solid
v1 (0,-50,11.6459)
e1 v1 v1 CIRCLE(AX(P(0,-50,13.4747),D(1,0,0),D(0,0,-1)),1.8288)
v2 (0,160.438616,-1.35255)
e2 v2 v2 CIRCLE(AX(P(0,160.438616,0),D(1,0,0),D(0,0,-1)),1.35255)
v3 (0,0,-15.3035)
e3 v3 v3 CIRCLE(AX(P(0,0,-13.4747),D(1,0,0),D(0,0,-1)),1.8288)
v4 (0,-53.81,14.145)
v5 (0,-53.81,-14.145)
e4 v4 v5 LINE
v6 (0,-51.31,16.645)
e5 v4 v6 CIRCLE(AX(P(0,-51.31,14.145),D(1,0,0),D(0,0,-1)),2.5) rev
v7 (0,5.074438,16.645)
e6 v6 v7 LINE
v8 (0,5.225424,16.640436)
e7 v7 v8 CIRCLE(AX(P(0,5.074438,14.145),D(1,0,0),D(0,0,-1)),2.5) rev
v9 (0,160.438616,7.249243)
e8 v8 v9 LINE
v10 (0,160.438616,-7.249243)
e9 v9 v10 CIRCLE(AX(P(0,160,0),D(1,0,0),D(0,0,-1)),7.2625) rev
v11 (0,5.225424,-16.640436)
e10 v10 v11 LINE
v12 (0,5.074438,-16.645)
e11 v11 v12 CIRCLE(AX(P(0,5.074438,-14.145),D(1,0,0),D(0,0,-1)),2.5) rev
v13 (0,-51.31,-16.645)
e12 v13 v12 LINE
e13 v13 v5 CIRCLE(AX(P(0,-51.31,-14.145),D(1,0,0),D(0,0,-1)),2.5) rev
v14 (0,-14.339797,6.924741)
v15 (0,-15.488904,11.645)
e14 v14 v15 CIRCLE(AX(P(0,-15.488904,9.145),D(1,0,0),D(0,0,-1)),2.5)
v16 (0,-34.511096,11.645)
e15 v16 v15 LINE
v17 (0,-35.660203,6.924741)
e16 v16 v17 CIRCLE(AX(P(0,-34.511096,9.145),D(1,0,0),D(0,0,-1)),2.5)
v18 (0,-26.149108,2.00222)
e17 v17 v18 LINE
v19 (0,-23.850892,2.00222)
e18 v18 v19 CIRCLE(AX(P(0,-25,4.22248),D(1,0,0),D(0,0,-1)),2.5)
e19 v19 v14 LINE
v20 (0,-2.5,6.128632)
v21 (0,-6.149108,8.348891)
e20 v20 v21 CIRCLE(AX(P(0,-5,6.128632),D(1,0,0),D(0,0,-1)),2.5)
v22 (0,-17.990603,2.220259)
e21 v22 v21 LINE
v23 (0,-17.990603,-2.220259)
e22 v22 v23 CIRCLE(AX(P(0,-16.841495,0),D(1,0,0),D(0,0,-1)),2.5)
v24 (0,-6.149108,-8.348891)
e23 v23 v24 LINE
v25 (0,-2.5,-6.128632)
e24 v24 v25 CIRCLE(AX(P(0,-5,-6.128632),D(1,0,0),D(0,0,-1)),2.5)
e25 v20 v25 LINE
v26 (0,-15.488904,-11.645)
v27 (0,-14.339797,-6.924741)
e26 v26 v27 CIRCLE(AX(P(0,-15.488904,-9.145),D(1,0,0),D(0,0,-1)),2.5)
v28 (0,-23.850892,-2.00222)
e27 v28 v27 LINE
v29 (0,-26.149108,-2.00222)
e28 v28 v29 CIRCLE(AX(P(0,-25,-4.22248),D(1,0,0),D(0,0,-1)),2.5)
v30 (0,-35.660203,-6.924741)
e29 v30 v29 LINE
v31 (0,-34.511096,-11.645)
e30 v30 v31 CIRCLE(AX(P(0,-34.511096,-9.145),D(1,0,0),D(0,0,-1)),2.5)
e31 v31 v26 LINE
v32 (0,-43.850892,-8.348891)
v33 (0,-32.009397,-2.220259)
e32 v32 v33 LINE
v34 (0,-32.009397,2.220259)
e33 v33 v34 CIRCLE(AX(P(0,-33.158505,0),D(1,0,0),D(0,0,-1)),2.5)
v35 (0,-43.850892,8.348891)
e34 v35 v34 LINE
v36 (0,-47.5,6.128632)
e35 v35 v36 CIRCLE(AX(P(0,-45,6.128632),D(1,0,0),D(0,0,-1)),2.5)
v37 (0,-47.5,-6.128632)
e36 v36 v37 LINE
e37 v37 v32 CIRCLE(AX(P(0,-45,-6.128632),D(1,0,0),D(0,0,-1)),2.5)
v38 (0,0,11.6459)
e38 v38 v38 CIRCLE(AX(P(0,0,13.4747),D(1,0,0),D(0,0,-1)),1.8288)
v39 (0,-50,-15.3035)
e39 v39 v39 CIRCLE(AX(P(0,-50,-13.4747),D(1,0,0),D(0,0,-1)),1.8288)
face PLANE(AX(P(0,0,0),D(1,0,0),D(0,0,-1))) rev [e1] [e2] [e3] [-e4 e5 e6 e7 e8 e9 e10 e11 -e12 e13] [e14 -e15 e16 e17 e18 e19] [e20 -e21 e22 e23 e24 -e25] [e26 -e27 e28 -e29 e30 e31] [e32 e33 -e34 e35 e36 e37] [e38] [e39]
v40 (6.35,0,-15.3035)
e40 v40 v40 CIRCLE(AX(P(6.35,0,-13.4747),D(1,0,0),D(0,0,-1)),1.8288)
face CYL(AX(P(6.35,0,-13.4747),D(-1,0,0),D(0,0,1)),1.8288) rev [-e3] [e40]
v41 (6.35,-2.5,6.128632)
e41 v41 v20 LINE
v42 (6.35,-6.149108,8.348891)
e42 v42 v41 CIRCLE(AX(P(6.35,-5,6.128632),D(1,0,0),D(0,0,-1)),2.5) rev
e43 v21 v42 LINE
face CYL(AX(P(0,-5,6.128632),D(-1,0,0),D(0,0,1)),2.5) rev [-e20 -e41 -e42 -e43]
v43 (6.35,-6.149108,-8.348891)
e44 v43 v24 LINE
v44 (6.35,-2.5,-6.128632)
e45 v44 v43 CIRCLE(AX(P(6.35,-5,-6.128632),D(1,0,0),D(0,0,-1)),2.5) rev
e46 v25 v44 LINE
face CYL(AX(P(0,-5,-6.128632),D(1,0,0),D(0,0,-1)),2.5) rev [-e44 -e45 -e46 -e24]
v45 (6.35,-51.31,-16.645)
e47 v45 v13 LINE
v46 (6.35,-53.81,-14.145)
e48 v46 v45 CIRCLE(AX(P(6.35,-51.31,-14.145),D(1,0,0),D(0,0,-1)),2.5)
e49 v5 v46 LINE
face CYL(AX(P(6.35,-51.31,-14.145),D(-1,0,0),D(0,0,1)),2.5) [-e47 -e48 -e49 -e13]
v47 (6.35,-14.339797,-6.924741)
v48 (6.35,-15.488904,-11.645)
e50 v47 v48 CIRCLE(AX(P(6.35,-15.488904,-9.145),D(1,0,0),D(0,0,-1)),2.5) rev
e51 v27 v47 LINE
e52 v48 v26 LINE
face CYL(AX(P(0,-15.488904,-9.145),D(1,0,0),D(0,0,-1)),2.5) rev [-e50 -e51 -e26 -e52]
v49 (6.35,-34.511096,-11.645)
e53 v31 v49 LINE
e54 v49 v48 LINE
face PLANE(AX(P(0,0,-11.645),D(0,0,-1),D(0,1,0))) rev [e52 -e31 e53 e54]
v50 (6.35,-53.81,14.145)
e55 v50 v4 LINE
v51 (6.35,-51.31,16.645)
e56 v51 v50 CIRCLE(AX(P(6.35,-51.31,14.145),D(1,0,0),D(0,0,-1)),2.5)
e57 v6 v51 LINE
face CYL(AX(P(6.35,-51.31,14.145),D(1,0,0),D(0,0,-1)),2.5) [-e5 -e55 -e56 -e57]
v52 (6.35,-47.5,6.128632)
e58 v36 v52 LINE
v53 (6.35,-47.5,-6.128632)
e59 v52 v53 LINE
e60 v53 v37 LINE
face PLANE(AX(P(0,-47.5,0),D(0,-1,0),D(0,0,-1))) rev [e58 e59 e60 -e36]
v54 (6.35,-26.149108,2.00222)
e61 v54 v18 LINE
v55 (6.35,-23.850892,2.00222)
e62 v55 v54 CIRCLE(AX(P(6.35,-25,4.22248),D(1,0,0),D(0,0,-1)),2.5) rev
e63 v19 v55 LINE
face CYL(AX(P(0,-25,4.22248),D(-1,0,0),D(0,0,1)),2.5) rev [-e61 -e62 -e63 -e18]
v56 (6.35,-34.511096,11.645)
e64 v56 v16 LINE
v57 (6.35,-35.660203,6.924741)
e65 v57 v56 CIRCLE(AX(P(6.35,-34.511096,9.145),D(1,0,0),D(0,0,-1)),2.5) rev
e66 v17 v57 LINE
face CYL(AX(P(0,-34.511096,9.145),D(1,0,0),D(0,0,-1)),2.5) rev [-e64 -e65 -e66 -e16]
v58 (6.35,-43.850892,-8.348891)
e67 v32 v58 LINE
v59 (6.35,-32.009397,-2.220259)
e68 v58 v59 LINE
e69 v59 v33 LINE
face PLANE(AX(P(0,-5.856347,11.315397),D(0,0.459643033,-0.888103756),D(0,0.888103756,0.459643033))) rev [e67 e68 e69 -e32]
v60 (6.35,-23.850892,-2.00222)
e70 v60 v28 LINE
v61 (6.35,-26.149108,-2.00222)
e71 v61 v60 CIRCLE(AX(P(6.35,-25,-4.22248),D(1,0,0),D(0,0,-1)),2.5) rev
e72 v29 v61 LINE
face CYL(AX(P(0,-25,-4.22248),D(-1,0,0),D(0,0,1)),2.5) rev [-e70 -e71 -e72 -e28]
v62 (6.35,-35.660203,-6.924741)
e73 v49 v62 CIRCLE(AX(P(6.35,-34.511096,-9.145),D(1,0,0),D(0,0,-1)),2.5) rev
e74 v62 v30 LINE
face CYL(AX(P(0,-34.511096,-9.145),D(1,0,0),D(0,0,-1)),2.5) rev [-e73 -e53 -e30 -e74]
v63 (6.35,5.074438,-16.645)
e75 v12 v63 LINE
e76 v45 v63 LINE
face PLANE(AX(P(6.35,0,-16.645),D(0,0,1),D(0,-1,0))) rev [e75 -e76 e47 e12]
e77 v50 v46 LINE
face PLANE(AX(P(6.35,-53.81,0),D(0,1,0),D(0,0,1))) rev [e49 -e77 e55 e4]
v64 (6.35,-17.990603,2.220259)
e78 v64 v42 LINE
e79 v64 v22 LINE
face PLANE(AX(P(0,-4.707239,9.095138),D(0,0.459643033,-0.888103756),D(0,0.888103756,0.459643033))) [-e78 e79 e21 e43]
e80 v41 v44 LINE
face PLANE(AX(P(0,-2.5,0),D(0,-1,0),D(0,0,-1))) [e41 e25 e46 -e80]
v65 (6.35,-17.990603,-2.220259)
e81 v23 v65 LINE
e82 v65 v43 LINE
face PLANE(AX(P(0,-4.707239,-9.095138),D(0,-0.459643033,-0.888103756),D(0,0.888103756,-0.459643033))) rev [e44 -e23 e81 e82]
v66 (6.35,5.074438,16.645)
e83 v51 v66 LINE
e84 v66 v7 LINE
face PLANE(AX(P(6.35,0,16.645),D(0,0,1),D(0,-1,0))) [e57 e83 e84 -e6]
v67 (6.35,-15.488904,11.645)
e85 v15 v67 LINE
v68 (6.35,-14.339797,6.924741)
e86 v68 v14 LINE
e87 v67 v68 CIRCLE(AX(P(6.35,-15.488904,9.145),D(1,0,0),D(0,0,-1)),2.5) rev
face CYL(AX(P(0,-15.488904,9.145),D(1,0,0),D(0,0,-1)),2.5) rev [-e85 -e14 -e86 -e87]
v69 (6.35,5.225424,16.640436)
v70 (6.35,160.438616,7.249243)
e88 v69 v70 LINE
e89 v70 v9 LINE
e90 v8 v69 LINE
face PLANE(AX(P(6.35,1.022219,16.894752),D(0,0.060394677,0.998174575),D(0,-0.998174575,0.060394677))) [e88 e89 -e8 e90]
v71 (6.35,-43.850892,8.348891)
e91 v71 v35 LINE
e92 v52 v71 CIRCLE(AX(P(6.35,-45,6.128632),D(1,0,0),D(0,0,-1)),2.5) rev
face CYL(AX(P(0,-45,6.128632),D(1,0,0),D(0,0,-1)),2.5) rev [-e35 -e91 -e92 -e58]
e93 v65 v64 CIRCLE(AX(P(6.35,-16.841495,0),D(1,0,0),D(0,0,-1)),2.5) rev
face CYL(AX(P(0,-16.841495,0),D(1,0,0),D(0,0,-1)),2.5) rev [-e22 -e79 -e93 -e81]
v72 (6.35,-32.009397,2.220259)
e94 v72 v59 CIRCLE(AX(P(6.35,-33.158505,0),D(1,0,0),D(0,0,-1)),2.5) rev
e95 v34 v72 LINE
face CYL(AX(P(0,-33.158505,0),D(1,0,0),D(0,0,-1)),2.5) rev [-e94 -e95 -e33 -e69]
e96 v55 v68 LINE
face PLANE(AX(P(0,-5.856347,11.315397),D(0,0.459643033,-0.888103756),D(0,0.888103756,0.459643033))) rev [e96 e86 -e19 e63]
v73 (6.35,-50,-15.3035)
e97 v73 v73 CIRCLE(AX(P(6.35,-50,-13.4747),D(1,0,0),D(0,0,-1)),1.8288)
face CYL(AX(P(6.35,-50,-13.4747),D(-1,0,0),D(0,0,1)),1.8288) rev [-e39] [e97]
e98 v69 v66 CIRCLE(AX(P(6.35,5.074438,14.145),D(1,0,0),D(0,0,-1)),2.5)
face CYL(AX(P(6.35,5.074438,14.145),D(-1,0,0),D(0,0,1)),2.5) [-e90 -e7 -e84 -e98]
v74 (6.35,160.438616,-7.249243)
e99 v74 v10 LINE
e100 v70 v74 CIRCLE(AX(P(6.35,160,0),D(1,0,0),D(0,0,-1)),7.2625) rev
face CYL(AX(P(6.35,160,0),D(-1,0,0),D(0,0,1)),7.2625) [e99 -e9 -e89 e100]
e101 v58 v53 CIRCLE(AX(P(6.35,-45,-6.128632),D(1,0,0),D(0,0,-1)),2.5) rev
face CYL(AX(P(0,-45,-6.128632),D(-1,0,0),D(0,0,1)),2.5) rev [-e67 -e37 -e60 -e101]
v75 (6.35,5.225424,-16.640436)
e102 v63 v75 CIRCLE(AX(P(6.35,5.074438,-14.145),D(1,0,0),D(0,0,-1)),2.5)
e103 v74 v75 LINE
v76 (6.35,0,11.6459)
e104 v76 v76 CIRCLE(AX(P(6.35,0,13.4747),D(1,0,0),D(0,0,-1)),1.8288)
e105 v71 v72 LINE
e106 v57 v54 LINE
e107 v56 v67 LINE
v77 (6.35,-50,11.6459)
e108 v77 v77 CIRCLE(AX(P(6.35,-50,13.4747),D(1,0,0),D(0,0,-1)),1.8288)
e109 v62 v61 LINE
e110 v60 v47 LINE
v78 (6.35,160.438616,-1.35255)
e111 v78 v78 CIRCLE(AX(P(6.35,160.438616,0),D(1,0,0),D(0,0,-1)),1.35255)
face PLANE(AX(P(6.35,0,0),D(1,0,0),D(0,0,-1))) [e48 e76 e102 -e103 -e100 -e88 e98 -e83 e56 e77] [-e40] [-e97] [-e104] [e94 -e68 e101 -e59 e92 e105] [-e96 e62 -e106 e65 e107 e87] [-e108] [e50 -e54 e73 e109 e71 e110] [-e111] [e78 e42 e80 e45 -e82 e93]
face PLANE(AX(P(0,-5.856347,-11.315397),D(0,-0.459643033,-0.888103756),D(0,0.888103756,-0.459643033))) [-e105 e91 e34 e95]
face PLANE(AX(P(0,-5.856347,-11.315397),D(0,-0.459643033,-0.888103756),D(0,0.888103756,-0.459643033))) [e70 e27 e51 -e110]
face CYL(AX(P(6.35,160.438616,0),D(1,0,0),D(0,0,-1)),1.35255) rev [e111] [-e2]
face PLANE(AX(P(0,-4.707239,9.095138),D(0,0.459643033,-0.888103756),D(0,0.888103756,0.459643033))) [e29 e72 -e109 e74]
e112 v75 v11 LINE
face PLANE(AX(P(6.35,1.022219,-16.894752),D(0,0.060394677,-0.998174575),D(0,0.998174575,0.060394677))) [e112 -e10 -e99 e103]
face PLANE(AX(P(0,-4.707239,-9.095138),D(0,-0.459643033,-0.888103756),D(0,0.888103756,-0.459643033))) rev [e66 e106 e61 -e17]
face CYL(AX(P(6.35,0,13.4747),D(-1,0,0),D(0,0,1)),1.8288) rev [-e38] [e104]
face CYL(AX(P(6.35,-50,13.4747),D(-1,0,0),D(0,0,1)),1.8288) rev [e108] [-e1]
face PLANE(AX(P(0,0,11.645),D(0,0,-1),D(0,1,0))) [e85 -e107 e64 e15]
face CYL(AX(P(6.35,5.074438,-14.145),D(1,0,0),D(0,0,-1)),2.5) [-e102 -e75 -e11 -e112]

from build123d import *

# Parameters (mm, degrees)
SKETCH1_W             = 33.29
SKETCH1_H             = 58.96
SKETCH1_R             = 1.8288
BOSS_EXTRUDE1_DEPTH   = 6.35
CUT_EXTRUDE1_DEPTH    = 169.208568246
FILLET1_R             = 2.5
FILLET2_R             = 2.5
F_6_32_TAPPED_HOLE1_D = 2.7051


with BuildPart() as part:
    # Sketch1 → Boss-Extrude1 (new body)
    # profile 1 of 2: a face of its own
    with BuildSketch(Plane(origin=(0, 0, 0), x_dir=(0, 0, -1), z_dir=(1, 0, 0))):
        with BuildLine():
            ThreePointArc((-7.249242854, 160.438616345), (0, 167.2625), (7.249242854, 160.438616345))
            Line((7.249242854, 160.438616345), (16.645, 5.15))
            Line((16.645, 5.15), (-16.645, 5.15))
            Line((-16.645, 5.15), (-7.249242854, 160.438616345))
        make_face()
    # profile 2 of 2: a face of its own
    with BuildSketch(Plane(origin=(0, 0, 0), x_dir=(0, 0, -1), z_dir=(1, 0, 0))):
        with Locations((0, -24.33)):
            Rectangle(SKETCH1_W, SKETCH1_H)
        with Locations((13.4747, -50)):
            Circle(SKETCH1_R, mode=Mode.SUBTRACT)
        with Locations((-13.4747, -50)):
            Circle(SKETCH1_R, mode=Mode.SUBTRACT)
        with Locations((13.4747, 0)):
            Circle(SKETCH1_R, mode=Mode.SUBTRACT)
        with Locations((-13.4747, 0)):
            Circle(SKETCH1_R, mode=Mode.SUBTRACT)
    extrude(amount=BOSS_EXTRUDE1_DEPTH)

    # Sketch2 → Cut-Extrude1 (cut, through all)
    with BuildSketch(Plane(origin=(6.35, 0, 0), x_dir=(0, 0, -1), z_dir=(1, 0, 0))):
        Polygon((11.645, -5.219501679), (1.407493202, -25), (11.645, -44.780498321), align=None)
        Polygon((0, -27.719501679), (-10.237506798, -47.5), (10.237506798, -47.5), align=None)
        Polygon((-11.645, -5.219501679), (-11.645, -44.780498321), (-1.407493202, -25), align=None)
        Polygon((-10.237506798, -2.5), (0, -22.280498321), (10.237506798, -2.5), align=None)
    extrude(amount=-CUT_EXTRUDE1_DEPTH, mode=Mode.SUBTRACT)

    # Fillet1
    fillet1_edges = [part.edges().sort_by_distance(p)[0] for p in [
        (3.175, -44.780498321, 11.645),
        (3.175, -5.219501679, 11.645),
        (3.175, -25, 1.407493202),
        (3.175, -47.5, -10.237506798),
        (3.175, -47.5, 10.237506798),
        (3.175, -27.719501679, 0),
        (3.175, -22.280498321, 0),
        (3.175, -2.5, 10.237506798),
        (3.175, -2.5, -10.237506798),
        (3.175, -25, -1.407493202),
        (3.175, -5.219501679, -11.645),
        (3.175, -44.780498321, -11.645),
    ]]
    fillet(fillet1_edges, radius=FILLET1_R)

    # Fillet2
    # the kernel refuses this fillet: 2.5 mm, written as the material it takes off along each edge
    with BuildSketch(Plane(origin=(-0.188905784, 5.15, -16.645), x_dir=(0, 0.9981745753787551, 0.06039467747609822), z_dir=(1, 0, 0))) as fillet2_piece_1:
        with BuildLine():
            CenterArc((FILLET2_R * 0.0302249253995, FILLET2_R), FILLET2_R, 266.537532795, 3.462467205)
            Line((-FILLET2_R * 0.0301697520766, FILLET2_R * 0.00182542462124), (0, 0))
            Line((0, 0), (FILLET2_R * 0.0302249253996, 0))
        make_face()
    extrude(amount=6.727811567, mode=Mode.SUBTRACT)
    with BuildSketch(Plane(origin=(-6.25, -53.81, -16.645), x_dir=(0, 1, 0), z_dir=(1, 0, 0))) as fillet2_piece_2:
        with BuildLine():
            CenterArc((FILLET2_R, FILLET2_R), FILLET2_R, 180, 90)
            Line((0, FILLET2_R), (0, 0))
            Line((0, 0), (FILLET2_R, 0))
        make_face()
    extrude(amount=18.85, mode=Mode.SUBTRACT)
    with BuildSketch(Plane(origin=(-6.25, -53.81, 16.645), x_dir=(0, 1, 0), z_dir=(1, 0, 0))) as fillet2_piece_3:
        with BuildLine():
            CenterArc((FILLET2_R, -FILLET2_R), FILLET2_R, 90, 90)
            Line((0, -FILLET2_R), (0, 0))
            Line((0, 0), (FILLET2_R, 0))
        make_face()
    extrude(amount=18.85, mode=Mode.SUBTRACT)
    with BuildSketch(Plane(origin=(-0.188905784, 5.15, 16.645), x_dir=(0, 0.9981745753787543, -0.06039467747611318), z_dir=(1, 0, 0))) as fillet2_piece_4:
        with BuildLine():
            CenterArc((FILLET2_R * 0.0302249253995, -FILLET2_R), FILLET2_R, 90, 3.462467205)
            Line((-FILLET2_R * 0.0301697520766, -FILLET2_R * 0.00182542462124), (0, 0))
            Line((0, 0), (FILLET2_R * 0.0302249253996, 0))
        make_face()
    extrude(amount=6.727811567, mode=Mode.SUBTRACT)

    # #6-32 Tapped Hole1 (through all)
    with Locations(Plane(origin=(6.35, 0, 0), x_dir=(0, 0, -1), z_dir=(1, 0, 0))):
        with Locations((0, 160.438616345)):
            Hole(F_6_32_TAPPED_HOLE1_D / 2)


solid = part.part
